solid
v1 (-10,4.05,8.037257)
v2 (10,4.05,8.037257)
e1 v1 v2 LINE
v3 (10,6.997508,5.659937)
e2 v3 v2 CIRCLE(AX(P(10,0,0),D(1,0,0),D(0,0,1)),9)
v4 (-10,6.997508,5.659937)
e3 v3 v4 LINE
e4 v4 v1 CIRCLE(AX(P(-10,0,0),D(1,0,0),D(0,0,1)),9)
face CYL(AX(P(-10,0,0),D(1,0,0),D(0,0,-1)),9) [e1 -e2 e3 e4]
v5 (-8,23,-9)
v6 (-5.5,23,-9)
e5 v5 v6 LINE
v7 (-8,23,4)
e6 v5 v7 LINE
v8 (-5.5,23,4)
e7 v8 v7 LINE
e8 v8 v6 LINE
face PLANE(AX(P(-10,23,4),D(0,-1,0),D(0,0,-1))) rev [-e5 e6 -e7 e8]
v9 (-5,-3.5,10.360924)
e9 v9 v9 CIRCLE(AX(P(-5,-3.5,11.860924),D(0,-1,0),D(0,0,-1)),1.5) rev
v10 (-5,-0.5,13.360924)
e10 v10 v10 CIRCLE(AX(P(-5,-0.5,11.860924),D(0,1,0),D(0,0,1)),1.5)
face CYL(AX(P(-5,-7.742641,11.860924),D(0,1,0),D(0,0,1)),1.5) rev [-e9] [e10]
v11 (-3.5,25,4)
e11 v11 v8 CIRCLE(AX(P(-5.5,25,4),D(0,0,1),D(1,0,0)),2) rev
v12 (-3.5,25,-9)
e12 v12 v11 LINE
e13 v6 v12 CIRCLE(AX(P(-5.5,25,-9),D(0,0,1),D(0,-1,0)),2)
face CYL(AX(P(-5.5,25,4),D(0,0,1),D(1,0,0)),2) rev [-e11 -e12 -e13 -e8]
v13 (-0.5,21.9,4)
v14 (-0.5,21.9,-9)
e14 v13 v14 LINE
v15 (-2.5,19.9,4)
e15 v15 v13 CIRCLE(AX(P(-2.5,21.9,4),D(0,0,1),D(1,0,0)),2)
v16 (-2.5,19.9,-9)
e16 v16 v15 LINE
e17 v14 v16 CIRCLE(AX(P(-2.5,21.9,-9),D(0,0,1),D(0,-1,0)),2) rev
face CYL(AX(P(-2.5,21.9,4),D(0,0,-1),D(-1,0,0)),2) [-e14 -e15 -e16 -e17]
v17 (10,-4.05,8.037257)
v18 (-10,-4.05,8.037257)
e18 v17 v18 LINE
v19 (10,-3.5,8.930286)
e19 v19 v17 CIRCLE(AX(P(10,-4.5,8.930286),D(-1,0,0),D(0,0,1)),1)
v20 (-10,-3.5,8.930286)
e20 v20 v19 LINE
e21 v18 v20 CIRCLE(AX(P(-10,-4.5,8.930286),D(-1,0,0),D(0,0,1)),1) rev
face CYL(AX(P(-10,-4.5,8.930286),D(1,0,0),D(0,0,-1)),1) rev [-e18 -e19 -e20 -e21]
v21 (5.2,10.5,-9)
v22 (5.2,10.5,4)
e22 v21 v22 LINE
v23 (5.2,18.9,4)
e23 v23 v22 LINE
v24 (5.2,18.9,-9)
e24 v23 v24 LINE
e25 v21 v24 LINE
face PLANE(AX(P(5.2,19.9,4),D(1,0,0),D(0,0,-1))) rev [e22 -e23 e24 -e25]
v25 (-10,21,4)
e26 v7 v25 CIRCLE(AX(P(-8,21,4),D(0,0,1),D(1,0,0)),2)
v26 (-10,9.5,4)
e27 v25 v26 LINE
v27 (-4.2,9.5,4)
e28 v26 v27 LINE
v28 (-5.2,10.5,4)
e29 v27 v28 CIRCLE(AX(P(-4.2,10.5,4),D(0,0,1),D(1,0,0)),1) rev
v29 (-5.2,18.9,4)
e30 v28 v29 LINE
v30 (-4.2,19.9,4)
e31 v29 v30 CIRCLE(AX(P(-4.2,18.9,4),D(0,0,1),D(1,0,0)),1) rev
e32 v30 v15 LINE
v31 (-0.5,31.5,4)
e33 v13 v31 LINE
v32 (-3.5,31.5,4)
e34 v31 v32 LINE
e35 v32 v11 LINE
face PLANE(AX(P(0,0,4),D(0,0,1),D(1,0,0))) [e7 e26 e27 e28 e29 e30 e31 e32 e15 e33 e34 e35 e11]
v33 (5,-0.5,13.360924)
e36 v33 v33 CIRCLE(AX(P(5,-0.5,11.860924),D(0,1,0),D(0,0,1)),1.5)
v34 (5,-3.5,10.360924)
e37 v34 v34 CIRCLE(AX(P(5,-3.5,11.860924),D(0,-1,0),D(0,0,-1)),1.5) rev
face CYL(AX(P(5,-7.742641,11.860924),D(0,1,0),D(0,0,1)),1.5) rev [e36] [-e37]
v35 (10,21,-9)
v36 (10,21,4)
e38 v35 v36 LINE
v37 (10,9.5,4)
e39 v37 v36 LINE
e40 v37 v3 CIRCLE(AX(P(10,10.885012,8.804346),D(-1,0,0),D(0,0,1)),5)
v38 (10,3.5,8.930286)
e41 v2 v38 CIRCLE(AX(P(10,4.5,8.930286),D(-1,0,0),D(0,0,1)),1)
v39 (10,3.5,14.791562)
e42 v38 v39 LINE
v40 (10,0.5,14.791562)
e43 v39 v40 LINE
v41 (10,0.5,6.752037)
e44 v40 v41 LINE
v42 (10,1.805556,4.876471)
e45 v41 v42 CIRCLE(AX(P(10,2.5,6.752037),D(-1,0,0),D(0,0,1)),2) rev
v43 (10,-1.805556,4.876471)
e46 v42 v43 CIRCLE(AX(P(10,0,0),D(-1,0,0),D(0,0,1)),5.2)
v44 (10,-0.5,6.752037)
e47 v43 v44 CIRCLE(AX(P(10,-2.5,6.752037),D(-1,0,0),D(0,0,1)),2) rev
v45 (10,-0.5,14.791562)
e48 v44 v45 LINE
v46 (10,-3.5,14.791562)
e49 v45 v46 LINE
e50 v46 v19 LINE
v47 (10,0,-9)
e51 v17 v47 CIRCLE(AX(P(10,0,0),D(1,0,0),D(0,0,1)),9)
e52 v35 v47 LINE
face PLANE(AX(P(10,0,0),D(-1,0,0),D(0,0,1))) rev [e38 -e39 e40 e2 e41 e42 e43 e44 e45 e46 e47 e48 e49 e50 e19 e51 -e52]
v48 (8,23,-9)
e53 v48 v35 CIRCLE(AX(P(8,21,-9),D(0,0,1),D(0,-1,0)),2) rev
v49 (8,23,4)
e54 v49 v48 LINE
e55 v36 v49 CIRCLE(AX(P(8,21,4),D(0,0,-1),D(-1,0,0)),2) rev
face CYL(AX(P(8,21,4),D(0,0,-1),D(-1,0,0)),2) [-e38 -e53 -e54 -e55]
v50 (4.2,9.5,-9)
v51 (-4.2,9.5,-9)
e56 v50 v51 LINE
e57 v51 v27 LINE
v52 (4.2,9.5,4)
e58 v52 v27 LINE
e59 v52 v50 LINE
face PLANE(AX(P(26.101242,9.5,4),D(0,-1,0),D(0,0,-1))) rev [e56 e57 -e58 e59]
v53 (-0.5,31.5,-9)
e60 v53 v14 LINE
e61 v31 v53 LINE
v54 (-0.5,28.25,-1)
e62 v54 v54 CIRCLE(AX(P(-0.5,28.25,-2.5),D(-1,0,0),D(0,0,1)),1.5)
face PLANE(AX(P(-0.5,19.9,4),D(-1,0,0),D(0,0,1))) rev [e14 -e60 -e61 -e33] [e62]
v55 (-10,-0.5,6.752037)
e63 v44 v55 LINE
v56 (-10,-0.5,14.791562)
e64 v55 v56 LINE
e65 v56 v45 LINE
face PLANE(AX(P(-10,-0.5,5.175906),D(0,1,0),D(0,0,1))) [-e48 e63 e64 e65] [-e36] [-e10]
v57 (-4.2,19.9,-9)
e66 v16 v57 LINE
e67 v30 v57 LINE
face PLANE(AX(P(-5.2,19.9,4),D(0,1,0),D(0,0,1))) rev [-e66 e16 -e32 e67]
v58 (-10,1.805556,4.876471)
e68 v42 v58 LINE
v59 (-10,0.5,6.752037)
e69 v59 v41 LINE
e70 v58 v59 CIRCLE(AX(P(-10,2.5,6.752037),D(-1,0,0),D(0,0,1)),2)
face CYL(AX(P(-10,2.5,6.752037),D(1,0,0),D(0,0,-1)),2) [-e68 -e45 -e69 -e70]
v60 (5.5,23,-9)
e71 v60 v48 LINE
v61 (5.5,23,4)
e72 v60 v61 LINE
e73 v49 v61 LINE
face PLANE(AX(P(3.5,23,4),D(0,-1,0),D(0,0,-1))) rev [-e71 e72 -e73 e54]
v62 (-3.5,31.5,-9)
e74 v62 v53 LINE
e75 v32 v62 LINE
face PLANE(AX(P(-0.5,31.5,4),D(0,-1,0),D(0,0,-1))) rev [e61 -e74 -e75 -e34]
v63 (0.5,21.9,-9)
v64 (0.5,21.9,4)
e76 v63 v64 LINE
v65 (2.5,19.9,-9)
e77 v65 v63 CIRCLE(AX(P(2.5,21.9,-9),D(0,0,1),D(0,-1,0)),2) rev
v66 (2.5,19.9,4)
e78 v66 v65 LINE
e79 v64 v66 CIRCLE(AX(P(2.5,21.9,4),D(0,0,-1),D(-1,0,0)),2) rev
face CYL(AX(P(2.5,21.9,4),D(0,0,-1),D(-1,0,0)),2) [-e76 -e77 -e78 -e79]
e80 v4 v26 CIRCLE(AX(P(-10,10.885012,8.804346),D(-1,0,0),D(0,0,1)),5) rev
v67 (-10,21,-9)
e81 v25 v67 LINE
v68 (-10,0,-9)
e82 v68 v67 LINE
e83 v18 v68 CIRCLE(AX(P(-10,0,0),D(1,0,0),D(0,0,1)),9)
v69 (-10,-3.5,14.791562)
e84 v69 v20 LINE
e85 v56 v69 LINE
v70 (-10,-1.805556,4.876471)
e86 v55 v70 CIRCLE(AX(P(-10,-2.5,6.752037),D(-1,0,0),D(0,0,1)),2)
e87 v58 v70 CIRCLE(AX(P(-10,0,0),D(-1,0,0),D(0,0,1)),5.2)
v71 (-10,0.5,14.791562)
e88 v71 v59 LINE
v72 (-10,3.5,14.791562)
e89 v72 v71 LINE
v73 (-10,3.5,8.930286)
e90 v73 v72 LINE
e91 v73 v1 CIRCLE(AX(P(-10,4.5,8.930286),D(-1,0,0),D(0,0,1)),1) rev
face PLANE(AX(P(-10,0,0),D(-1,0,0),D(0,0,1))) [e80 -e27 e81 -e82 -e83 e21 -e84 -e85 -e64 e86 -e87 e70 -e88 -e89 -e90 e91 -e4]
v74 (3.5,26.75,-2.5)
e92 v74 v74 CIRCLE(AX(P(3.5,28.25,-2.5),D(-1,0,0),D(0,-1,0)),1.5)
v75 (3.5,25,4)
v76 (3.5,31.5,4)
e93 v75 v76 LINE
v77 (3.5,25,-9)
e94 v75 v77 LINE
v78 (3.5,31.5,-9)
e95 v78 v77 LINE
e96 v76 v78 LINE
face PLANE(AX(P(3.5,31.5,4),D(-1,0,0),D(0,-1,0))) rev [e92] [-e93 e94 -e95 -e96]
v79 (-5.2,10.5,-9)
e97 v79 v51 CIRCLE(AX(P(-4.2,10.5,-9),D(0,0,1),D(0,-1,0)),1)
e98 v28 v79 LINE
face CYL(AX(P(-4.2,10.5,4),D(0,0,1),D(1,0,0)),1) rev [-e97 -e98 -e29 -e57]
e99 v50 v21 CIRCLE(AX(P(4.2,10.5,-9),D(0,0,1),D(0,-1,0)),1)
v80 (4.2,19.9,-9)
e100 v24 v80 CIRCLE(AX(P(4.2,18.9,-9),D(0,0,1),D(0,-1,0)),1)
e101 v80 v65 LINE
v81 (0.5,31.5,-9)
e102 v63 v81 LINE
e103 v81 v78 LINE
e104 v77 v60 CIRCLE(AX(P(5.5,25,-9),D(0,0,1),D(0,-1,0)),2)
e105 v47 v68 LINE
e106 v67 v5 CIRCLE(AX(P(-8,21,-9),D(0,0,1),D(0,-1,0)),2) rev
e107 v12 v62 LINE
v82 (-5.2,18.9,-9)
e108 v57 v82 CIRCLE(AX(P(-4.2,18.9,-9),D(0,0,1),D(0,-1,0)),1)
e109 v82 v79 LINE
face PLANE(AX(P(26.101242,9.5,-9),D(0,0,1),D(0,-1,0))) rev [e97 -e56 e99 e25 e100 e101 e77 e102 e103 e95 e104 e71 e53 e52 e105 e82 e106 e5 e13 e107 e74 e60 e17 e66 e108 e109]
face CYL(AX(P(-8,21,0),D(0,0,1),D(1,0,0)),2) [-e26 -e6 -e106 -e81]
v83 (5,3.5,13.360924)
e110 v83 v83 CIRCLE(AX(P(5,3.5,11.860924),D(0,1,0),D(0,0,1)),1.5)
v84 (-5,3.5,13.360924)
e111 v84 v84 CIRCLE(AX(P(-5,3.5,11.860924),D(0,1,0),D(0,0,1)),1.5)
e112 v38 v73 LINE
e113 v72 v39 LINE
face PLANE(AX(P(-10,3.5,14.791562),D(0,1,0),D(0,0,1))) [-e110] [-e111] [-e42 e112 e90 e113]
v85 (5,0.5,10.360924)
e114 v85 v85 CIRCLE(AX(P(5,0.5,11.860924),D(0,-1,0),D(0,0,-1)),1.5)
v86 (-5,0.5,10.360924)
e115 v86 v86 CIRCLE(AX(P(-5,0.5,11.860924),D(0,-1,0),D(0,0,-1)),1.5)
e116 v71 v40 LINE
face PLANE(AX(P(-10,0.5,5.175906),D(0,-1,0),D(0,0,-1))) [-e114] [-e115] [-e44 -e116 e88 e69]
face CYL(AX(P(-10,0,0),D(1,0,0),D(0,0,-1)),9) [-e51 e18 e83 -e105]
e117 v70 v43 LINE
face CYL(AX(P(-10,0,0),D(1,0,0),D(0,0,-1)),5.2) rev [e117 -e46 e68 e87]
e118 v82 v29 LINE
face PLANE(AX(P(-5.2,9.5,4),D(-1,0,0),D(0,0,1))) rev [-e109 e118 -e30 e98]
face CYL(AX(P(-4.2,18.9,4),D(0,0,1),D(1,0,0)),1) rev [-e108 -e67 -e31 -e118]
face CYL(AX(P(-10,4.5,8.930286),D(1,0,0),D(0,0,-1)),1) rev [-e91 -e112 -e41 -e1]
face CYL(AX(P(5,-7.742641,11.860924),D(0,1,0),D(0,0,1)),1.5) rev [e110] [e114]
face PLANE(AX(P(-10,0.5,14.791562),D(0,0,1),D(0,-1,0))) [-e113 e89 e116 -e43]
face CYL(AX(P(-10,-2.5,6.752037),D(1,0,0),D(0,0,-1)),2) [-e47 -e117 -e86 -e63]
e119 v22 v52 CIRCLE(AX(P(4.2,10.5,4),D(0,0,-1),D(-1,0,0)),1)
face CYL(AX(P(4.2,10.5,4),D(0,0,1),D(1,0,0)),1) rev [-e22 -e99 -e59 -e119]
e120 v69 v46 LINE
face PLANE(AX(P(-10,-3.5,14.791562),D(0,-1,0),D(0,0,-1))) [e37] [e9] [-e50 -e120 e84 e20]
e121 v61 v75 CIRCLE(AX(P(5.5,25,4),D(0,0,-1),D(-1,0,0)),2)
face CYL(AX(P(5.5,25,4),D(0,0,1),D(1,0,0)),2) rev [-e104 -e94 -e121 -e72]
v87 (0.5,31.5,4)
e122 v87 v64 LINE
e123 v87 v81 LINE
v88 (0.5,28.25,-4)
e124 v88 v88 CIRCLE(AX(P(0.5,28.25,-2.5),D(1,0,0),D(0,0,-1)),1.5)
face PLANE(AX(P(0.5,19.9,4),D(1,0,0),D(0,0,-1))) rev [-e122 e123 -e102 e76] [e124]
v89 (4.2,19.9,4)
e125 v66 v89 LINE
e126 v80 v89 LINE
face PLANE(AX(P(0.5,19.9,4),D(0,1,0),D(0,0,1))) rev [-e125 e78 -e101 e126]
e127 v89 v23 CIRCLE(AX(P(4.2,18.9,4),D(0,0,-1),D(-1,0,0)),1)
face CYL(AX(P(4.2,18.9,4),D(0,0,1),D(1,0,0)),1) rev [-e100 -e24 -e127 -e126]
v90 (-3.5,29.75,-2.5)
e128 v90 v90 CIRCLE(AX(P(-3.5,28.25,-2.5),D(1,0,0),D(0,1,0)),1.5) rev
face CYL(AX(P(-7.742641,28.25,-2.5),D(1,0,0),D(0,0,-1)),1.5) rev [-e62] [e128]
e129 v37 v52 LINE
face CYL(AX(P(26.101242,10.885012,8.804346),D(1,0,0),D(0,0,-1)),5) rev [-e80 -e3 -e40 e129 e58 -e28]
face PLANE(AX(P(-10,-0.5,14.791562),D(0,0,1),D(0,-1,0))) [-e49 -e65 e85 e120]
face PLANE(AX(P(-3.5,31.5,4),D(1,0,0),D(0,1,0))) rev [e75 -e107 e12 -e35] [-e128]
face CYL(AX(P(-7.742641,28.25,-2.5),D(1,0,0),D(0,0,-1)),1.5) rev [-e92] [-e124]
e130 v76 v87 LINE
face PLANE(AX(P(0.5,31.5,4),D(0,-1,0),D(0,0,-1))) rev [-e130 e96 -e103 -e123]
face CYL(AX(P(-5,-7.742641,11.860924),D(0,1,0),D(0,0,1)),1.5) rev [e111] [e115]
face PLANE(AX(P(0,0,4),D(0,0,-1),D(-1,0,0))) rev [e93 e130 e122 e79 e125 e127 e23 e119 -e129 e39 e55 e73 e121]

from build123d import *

# Parameters (mm, degrees)
BOSS_EXTRUDE1_DEPTH            = 10
BOSS_EXTRUDE1_DEPTH_BACK       = 10
FILLET1_R                      = 1
BOSS_EXTRUDE2_START            = -10
BOSS_EXTRUDE2_DEPTH            = 20
FILLET2_R                      = 5
BOSS_EXTRUDE3_DEPTH            = 4
BOSS_EXTRUDE3_DEPTH_BACK       = 9
FILLET3_R                      = 1
FILLET4_R                      = 2
CUT_EXTRUDE1_REACH             = 35.208
SKETCH4_R                      = 1.5
CUT_EXTRUDE2_REACH             = 38.208
SKETCH5_R                      = 1.5
CUT_EXTRUDE2_DIRECTION_2_REACH = 38.208
FILLET5_R                      = 2


with BuildPart() as part:
    # Sketch1 → Boss-Extrude1 (new, two sides: drawn at the far end of the back side and taken through both)
    with BuildSketch(Plane(origin=(0, 0, 0), x_dir=(0, 0, -1), z_dir=(1, 0, 0)).offset(-BOSS_EXTRUDE1_DEPTH_BACK)):
        with BuildLine():
            Line((-5.175905718, 0.5), (-14.791561976, 0.5))
            Line((-14.791561976, 0.5), (-14.791561976, 3.5))
            Line((-14.791561976, 3.5), (-8.291561976, 3.5))
            ThreePointArc((-8.291561976, 3.5), (9, 0), (-8.291561976, -3.5))
            Line((-8.291561976, -3.5), (-14.791561976, -3.5))
            Line((-14.791561976, -3.5), (-14.791561976, -0.5))
            Line((-14.791561976, -0.5), (-5.175905718, -0.5))
            ThreePointArc((-5.175905718, -0.5), (5.2, 0), (-5.175905718, 0.5))
        make_face()
    extrude(amount=BOSS_EXTRUDE1_DEPTH + BOSS_EXTRUDE1_DEPTH_BACK)

    # Fillet1
    fillet1_edges = [part.edges().sort_by_distance(p)[0] for p in [
        (0, 3.5, 8.291561976),
        (0, -3.5, 8.291561976),
    ]]
    fillet(fillet1_edges, radius=FILLET1_R)

    # Sketch2 → Boss-Extrude2 (add)
    with BuildSketch(Plane(origin=(0, 0, 0), x_dir=(0, 0, -1), z_dir=(1, 0, 0)).offset(BOSS_EXTRUDE2_START)):
        with BuildLine():
            Line((-4, 8.062257748), (-4, 9.5))
            Line((-4, 9.5), (4, 9.5))
            Line((4, 9.5), (9, 9.5))
            Line((9, 9.5), (9, 0))
            ThreePointArc((9, 0), (7.64852927, 4.74341649), (4, 8.062257748))
            Line((4, 8.062257748), (-4, 8.062257748))
        make_face()
    extrude(amount=BOSS_EXTRUDE2_DEPTH)

    # Fillet2
    # the kernel refuses this fillet: 5 mm, written as the material it adds along each edge
    with BuildSketch(Plane(origin=(-10, 8.062257748, 4), x_dir=(0, -0.5399133181781692, 0.8417206239922121), z_dir=(1, 0, 0))) as fillet2_piece_1:
        with BuildLine():
            CenterArc((2.519874472, -4.969901053), FILLET2_R, 96.289938273, 34.950941651)
            Line((-0.77625619, -1.210177305), (-0.842178803, -1.13498283))
            ThreePointArc((-0.842178803, -1.13498283), (-0.472300157, -0.551097321), (-0.084172062, 0.053991332))
            Line((-0.084172062, 0.053991332), (0.010955976, 0.099398021))
            ThreePointArc((0.010955976, 0.099398021), (0.986037837, 0.045821895), (1.961119698, 0.099398021))
            Line((1.961119698, 0.099398021), (1.972075674, 0))
        make_face()
    extrude(amount=20)

    # Sketch3 → Boss-Extrude3 (add, two sides: drawn at the far end of the back side and taken through both)
    with BuildSketch(Plane.XY.offset(-BOSS_EXTRUDE3_DEPTH_BACK)):
        Polygon((-5.2, 9.5), (-5.2, 19.9), (-0.5, 19.9), (-0.5, 31.5), (-3.5, 31.5), (-3.5, 23), (-10, 23), (-10, 9.5), align=None)
        Polygon((5.2, 19.9), (5.2, 9.5), (10, 9.5), (10, 23), (3.5, 23), (3.5, 31.5), (0.5, 31.5), (0.5, 19.9), align=None)
    extrude(amount=BOSS_EXTRUDE3_DEPTH + BOSS_EXTRUDE3_DEPTH_BACK)

    # Fillet3
    fillet3_edges = [part.edges().sort_by_distance(p)[0] for p in [
        (-5.2, 9.5, -2.5),
        (-5.2, 19.9, -2.5),
        (5.2, 19.9, -2.5),
        (5.2, 9.5, -2.5),
    ]]
    fillet(fillet3_edges, radius=FILLET3_R)

    # Fillet4
    fillet4_edges = [part.edges().sort_by_distance(p)[0] for p in [
        (-3.5, 23, -2.5),
        (-10, 23, -2.5),
        (10, 23, -2.5),
        (3.5, 23, -2.5),
    ]]
    fillet(fillet4_edges, radius=FILLET4_R)

    # Cut-Extrude1: up to this face of the body (flat: up to its plane)
    cut_extrude1_end = Plane(part.part.faces().sort_by_distance((0, -3.5, 11.860923763))[0])
    # Sketch4 → Cut-Extrude1 (cut, up to the picked face)
    with BuildSketch(Plane(origin=(0, 3.5, 0), x_dir=(1, 0, 0), z_dir=(0, 1, 0)), mode=Mode.PRIVATE) as cut_extrude1_sk1:
        with Locations(Location((-5, -11.860923763, 0), (0, 0, 270))):
            Circle(SKETCH4_R)
    cut_extrude1_tool1 = split(extrude(cut_extrude1_sk1.sketch, amount=-CUT_EXTRUDE1_REACH, mode=Mode.PRIVATE), bisect_by=cut_extrude1_end, keep=Keep.BOTH, mode=Mode.PRIVATE)
    # Sketch4 → Cut-Extrude1 (cut, up to the picked face)
    with BuildSketch(Plane(origin=(0, 3.5, 0), x_dir=(1, 0, 0), z_dir=(0, 1, 0)), mode=Mode.PRIVATE) as cut_extrude1_sk2:
        with Locations(Location((5, -11.860923763, 0), (0, 0, 270))):
            Circle(SKETCH4_R)
    cut_extrude1_tool2 = split(extrude(cut_extrude1_sk2.sketch, amount=-CUT_EXTRUDE1_REACH, mode=Mode.PRIVATE), bisect_by=cut_extrude1_end, keep=Keep.BOTH, mode=Mode.PRIVATE)
    add(cut_extrude1_tool1.solids().sort_by(Axis((-5, 3.5, 11.860924), (0, -1, 0)))[0], mode=Mode.SUBTRACT)
    add(cut_extrude1_tool2.solids().sort_by(Axis((5, 3.5, 11.860924), (0, -1, 0)))[0], mode=Mode.SUBTRACT)

    # Cut-Extrude2: up to this face of the body (flat: up to its plane)
    cut_extrude2_end = Plane(part.part.faces().sort_by_distance((-3.5, 28.25, -2.5))[0])
    # Sketch5 → Cut-Extrude2 (cut, up to the picked face)
    with BuildSketch(Plane(origin=(0, 0, 0), x_dir=(0, 0, -1), z_dir=(1, 0, 0)), mode=Mode.PRIVATE) as cut_extrude2_sk1:
        with Locations((2.5, 28.25)):
            Circle(SKETCH5_R)
    cut_extrude2_tool1 = split(extrude(cut_extrude2_sk1.sketch, amount=-CUT_EXTRUDE2_REACH, mode=Mode.PRIVATE), bisect_by=cut_extrude2_end, keep=Keep.BOTH, mode=Mode.PRIVATE)
    add(cut_extrude2_tool1.solids().sort_by(Axis((0, 28.25, -2.5), (-1, 0, 0)))[0], mode=Mode.SUBTRACT)

    # Cut-Extrude2 direction 2: up to this face of the body (flat: up to its plane)
    cut_extrude2_direction_2_end = Plane(part.part.faces().sort_by_distance((3.5, 28.25, -2.5))[0])
    # Sketch5 → Cut-Extrude2 direction 2 (cut, up to the picked face)
    with BuildSketch(Plane(origin=(0, 0, 0), x_dir=(0, 0, -1), z_dir=(1, 0, 0)), mode=Mode.PRIVATE) as cut_extrude2_direction_2_sk1:
        with Locations((2.5, 28.25)):
            Circle(SKETCH5_R)
    cut_extrude2_direction_2_tool1 = split(extrude(cut_extrude2_direction_2_sk1.sketch, amount=CUT_EXTRUDE2_DIRECTION_2_REACH, mode=Mode.PRIVATE), bisect_by=cut_extrude2_direction_2_end, keep=Keep.BOTH, mode=Mode.PRIVATE)
    add(cut_extrude2_direction_2_tool1.solids().sort_by(Axis((0, 28.25, -2.5), (1, 0, 0)))[0], mode=Mode.SUBTRACT)

    # Fillet5
    fillet5_edges = [part.edges().sort_by_distance(p)[0] for p in [
        (0, 0.5, 5.175905718),
        (0, -0.5, 5.175905718),
        (-0.5, 19.9, -2.5),
        (0.5, 19.9, -2.5),
    ]]
    fillet(fillet5_edges, radius=FILLET5_R)


solid = part.part
